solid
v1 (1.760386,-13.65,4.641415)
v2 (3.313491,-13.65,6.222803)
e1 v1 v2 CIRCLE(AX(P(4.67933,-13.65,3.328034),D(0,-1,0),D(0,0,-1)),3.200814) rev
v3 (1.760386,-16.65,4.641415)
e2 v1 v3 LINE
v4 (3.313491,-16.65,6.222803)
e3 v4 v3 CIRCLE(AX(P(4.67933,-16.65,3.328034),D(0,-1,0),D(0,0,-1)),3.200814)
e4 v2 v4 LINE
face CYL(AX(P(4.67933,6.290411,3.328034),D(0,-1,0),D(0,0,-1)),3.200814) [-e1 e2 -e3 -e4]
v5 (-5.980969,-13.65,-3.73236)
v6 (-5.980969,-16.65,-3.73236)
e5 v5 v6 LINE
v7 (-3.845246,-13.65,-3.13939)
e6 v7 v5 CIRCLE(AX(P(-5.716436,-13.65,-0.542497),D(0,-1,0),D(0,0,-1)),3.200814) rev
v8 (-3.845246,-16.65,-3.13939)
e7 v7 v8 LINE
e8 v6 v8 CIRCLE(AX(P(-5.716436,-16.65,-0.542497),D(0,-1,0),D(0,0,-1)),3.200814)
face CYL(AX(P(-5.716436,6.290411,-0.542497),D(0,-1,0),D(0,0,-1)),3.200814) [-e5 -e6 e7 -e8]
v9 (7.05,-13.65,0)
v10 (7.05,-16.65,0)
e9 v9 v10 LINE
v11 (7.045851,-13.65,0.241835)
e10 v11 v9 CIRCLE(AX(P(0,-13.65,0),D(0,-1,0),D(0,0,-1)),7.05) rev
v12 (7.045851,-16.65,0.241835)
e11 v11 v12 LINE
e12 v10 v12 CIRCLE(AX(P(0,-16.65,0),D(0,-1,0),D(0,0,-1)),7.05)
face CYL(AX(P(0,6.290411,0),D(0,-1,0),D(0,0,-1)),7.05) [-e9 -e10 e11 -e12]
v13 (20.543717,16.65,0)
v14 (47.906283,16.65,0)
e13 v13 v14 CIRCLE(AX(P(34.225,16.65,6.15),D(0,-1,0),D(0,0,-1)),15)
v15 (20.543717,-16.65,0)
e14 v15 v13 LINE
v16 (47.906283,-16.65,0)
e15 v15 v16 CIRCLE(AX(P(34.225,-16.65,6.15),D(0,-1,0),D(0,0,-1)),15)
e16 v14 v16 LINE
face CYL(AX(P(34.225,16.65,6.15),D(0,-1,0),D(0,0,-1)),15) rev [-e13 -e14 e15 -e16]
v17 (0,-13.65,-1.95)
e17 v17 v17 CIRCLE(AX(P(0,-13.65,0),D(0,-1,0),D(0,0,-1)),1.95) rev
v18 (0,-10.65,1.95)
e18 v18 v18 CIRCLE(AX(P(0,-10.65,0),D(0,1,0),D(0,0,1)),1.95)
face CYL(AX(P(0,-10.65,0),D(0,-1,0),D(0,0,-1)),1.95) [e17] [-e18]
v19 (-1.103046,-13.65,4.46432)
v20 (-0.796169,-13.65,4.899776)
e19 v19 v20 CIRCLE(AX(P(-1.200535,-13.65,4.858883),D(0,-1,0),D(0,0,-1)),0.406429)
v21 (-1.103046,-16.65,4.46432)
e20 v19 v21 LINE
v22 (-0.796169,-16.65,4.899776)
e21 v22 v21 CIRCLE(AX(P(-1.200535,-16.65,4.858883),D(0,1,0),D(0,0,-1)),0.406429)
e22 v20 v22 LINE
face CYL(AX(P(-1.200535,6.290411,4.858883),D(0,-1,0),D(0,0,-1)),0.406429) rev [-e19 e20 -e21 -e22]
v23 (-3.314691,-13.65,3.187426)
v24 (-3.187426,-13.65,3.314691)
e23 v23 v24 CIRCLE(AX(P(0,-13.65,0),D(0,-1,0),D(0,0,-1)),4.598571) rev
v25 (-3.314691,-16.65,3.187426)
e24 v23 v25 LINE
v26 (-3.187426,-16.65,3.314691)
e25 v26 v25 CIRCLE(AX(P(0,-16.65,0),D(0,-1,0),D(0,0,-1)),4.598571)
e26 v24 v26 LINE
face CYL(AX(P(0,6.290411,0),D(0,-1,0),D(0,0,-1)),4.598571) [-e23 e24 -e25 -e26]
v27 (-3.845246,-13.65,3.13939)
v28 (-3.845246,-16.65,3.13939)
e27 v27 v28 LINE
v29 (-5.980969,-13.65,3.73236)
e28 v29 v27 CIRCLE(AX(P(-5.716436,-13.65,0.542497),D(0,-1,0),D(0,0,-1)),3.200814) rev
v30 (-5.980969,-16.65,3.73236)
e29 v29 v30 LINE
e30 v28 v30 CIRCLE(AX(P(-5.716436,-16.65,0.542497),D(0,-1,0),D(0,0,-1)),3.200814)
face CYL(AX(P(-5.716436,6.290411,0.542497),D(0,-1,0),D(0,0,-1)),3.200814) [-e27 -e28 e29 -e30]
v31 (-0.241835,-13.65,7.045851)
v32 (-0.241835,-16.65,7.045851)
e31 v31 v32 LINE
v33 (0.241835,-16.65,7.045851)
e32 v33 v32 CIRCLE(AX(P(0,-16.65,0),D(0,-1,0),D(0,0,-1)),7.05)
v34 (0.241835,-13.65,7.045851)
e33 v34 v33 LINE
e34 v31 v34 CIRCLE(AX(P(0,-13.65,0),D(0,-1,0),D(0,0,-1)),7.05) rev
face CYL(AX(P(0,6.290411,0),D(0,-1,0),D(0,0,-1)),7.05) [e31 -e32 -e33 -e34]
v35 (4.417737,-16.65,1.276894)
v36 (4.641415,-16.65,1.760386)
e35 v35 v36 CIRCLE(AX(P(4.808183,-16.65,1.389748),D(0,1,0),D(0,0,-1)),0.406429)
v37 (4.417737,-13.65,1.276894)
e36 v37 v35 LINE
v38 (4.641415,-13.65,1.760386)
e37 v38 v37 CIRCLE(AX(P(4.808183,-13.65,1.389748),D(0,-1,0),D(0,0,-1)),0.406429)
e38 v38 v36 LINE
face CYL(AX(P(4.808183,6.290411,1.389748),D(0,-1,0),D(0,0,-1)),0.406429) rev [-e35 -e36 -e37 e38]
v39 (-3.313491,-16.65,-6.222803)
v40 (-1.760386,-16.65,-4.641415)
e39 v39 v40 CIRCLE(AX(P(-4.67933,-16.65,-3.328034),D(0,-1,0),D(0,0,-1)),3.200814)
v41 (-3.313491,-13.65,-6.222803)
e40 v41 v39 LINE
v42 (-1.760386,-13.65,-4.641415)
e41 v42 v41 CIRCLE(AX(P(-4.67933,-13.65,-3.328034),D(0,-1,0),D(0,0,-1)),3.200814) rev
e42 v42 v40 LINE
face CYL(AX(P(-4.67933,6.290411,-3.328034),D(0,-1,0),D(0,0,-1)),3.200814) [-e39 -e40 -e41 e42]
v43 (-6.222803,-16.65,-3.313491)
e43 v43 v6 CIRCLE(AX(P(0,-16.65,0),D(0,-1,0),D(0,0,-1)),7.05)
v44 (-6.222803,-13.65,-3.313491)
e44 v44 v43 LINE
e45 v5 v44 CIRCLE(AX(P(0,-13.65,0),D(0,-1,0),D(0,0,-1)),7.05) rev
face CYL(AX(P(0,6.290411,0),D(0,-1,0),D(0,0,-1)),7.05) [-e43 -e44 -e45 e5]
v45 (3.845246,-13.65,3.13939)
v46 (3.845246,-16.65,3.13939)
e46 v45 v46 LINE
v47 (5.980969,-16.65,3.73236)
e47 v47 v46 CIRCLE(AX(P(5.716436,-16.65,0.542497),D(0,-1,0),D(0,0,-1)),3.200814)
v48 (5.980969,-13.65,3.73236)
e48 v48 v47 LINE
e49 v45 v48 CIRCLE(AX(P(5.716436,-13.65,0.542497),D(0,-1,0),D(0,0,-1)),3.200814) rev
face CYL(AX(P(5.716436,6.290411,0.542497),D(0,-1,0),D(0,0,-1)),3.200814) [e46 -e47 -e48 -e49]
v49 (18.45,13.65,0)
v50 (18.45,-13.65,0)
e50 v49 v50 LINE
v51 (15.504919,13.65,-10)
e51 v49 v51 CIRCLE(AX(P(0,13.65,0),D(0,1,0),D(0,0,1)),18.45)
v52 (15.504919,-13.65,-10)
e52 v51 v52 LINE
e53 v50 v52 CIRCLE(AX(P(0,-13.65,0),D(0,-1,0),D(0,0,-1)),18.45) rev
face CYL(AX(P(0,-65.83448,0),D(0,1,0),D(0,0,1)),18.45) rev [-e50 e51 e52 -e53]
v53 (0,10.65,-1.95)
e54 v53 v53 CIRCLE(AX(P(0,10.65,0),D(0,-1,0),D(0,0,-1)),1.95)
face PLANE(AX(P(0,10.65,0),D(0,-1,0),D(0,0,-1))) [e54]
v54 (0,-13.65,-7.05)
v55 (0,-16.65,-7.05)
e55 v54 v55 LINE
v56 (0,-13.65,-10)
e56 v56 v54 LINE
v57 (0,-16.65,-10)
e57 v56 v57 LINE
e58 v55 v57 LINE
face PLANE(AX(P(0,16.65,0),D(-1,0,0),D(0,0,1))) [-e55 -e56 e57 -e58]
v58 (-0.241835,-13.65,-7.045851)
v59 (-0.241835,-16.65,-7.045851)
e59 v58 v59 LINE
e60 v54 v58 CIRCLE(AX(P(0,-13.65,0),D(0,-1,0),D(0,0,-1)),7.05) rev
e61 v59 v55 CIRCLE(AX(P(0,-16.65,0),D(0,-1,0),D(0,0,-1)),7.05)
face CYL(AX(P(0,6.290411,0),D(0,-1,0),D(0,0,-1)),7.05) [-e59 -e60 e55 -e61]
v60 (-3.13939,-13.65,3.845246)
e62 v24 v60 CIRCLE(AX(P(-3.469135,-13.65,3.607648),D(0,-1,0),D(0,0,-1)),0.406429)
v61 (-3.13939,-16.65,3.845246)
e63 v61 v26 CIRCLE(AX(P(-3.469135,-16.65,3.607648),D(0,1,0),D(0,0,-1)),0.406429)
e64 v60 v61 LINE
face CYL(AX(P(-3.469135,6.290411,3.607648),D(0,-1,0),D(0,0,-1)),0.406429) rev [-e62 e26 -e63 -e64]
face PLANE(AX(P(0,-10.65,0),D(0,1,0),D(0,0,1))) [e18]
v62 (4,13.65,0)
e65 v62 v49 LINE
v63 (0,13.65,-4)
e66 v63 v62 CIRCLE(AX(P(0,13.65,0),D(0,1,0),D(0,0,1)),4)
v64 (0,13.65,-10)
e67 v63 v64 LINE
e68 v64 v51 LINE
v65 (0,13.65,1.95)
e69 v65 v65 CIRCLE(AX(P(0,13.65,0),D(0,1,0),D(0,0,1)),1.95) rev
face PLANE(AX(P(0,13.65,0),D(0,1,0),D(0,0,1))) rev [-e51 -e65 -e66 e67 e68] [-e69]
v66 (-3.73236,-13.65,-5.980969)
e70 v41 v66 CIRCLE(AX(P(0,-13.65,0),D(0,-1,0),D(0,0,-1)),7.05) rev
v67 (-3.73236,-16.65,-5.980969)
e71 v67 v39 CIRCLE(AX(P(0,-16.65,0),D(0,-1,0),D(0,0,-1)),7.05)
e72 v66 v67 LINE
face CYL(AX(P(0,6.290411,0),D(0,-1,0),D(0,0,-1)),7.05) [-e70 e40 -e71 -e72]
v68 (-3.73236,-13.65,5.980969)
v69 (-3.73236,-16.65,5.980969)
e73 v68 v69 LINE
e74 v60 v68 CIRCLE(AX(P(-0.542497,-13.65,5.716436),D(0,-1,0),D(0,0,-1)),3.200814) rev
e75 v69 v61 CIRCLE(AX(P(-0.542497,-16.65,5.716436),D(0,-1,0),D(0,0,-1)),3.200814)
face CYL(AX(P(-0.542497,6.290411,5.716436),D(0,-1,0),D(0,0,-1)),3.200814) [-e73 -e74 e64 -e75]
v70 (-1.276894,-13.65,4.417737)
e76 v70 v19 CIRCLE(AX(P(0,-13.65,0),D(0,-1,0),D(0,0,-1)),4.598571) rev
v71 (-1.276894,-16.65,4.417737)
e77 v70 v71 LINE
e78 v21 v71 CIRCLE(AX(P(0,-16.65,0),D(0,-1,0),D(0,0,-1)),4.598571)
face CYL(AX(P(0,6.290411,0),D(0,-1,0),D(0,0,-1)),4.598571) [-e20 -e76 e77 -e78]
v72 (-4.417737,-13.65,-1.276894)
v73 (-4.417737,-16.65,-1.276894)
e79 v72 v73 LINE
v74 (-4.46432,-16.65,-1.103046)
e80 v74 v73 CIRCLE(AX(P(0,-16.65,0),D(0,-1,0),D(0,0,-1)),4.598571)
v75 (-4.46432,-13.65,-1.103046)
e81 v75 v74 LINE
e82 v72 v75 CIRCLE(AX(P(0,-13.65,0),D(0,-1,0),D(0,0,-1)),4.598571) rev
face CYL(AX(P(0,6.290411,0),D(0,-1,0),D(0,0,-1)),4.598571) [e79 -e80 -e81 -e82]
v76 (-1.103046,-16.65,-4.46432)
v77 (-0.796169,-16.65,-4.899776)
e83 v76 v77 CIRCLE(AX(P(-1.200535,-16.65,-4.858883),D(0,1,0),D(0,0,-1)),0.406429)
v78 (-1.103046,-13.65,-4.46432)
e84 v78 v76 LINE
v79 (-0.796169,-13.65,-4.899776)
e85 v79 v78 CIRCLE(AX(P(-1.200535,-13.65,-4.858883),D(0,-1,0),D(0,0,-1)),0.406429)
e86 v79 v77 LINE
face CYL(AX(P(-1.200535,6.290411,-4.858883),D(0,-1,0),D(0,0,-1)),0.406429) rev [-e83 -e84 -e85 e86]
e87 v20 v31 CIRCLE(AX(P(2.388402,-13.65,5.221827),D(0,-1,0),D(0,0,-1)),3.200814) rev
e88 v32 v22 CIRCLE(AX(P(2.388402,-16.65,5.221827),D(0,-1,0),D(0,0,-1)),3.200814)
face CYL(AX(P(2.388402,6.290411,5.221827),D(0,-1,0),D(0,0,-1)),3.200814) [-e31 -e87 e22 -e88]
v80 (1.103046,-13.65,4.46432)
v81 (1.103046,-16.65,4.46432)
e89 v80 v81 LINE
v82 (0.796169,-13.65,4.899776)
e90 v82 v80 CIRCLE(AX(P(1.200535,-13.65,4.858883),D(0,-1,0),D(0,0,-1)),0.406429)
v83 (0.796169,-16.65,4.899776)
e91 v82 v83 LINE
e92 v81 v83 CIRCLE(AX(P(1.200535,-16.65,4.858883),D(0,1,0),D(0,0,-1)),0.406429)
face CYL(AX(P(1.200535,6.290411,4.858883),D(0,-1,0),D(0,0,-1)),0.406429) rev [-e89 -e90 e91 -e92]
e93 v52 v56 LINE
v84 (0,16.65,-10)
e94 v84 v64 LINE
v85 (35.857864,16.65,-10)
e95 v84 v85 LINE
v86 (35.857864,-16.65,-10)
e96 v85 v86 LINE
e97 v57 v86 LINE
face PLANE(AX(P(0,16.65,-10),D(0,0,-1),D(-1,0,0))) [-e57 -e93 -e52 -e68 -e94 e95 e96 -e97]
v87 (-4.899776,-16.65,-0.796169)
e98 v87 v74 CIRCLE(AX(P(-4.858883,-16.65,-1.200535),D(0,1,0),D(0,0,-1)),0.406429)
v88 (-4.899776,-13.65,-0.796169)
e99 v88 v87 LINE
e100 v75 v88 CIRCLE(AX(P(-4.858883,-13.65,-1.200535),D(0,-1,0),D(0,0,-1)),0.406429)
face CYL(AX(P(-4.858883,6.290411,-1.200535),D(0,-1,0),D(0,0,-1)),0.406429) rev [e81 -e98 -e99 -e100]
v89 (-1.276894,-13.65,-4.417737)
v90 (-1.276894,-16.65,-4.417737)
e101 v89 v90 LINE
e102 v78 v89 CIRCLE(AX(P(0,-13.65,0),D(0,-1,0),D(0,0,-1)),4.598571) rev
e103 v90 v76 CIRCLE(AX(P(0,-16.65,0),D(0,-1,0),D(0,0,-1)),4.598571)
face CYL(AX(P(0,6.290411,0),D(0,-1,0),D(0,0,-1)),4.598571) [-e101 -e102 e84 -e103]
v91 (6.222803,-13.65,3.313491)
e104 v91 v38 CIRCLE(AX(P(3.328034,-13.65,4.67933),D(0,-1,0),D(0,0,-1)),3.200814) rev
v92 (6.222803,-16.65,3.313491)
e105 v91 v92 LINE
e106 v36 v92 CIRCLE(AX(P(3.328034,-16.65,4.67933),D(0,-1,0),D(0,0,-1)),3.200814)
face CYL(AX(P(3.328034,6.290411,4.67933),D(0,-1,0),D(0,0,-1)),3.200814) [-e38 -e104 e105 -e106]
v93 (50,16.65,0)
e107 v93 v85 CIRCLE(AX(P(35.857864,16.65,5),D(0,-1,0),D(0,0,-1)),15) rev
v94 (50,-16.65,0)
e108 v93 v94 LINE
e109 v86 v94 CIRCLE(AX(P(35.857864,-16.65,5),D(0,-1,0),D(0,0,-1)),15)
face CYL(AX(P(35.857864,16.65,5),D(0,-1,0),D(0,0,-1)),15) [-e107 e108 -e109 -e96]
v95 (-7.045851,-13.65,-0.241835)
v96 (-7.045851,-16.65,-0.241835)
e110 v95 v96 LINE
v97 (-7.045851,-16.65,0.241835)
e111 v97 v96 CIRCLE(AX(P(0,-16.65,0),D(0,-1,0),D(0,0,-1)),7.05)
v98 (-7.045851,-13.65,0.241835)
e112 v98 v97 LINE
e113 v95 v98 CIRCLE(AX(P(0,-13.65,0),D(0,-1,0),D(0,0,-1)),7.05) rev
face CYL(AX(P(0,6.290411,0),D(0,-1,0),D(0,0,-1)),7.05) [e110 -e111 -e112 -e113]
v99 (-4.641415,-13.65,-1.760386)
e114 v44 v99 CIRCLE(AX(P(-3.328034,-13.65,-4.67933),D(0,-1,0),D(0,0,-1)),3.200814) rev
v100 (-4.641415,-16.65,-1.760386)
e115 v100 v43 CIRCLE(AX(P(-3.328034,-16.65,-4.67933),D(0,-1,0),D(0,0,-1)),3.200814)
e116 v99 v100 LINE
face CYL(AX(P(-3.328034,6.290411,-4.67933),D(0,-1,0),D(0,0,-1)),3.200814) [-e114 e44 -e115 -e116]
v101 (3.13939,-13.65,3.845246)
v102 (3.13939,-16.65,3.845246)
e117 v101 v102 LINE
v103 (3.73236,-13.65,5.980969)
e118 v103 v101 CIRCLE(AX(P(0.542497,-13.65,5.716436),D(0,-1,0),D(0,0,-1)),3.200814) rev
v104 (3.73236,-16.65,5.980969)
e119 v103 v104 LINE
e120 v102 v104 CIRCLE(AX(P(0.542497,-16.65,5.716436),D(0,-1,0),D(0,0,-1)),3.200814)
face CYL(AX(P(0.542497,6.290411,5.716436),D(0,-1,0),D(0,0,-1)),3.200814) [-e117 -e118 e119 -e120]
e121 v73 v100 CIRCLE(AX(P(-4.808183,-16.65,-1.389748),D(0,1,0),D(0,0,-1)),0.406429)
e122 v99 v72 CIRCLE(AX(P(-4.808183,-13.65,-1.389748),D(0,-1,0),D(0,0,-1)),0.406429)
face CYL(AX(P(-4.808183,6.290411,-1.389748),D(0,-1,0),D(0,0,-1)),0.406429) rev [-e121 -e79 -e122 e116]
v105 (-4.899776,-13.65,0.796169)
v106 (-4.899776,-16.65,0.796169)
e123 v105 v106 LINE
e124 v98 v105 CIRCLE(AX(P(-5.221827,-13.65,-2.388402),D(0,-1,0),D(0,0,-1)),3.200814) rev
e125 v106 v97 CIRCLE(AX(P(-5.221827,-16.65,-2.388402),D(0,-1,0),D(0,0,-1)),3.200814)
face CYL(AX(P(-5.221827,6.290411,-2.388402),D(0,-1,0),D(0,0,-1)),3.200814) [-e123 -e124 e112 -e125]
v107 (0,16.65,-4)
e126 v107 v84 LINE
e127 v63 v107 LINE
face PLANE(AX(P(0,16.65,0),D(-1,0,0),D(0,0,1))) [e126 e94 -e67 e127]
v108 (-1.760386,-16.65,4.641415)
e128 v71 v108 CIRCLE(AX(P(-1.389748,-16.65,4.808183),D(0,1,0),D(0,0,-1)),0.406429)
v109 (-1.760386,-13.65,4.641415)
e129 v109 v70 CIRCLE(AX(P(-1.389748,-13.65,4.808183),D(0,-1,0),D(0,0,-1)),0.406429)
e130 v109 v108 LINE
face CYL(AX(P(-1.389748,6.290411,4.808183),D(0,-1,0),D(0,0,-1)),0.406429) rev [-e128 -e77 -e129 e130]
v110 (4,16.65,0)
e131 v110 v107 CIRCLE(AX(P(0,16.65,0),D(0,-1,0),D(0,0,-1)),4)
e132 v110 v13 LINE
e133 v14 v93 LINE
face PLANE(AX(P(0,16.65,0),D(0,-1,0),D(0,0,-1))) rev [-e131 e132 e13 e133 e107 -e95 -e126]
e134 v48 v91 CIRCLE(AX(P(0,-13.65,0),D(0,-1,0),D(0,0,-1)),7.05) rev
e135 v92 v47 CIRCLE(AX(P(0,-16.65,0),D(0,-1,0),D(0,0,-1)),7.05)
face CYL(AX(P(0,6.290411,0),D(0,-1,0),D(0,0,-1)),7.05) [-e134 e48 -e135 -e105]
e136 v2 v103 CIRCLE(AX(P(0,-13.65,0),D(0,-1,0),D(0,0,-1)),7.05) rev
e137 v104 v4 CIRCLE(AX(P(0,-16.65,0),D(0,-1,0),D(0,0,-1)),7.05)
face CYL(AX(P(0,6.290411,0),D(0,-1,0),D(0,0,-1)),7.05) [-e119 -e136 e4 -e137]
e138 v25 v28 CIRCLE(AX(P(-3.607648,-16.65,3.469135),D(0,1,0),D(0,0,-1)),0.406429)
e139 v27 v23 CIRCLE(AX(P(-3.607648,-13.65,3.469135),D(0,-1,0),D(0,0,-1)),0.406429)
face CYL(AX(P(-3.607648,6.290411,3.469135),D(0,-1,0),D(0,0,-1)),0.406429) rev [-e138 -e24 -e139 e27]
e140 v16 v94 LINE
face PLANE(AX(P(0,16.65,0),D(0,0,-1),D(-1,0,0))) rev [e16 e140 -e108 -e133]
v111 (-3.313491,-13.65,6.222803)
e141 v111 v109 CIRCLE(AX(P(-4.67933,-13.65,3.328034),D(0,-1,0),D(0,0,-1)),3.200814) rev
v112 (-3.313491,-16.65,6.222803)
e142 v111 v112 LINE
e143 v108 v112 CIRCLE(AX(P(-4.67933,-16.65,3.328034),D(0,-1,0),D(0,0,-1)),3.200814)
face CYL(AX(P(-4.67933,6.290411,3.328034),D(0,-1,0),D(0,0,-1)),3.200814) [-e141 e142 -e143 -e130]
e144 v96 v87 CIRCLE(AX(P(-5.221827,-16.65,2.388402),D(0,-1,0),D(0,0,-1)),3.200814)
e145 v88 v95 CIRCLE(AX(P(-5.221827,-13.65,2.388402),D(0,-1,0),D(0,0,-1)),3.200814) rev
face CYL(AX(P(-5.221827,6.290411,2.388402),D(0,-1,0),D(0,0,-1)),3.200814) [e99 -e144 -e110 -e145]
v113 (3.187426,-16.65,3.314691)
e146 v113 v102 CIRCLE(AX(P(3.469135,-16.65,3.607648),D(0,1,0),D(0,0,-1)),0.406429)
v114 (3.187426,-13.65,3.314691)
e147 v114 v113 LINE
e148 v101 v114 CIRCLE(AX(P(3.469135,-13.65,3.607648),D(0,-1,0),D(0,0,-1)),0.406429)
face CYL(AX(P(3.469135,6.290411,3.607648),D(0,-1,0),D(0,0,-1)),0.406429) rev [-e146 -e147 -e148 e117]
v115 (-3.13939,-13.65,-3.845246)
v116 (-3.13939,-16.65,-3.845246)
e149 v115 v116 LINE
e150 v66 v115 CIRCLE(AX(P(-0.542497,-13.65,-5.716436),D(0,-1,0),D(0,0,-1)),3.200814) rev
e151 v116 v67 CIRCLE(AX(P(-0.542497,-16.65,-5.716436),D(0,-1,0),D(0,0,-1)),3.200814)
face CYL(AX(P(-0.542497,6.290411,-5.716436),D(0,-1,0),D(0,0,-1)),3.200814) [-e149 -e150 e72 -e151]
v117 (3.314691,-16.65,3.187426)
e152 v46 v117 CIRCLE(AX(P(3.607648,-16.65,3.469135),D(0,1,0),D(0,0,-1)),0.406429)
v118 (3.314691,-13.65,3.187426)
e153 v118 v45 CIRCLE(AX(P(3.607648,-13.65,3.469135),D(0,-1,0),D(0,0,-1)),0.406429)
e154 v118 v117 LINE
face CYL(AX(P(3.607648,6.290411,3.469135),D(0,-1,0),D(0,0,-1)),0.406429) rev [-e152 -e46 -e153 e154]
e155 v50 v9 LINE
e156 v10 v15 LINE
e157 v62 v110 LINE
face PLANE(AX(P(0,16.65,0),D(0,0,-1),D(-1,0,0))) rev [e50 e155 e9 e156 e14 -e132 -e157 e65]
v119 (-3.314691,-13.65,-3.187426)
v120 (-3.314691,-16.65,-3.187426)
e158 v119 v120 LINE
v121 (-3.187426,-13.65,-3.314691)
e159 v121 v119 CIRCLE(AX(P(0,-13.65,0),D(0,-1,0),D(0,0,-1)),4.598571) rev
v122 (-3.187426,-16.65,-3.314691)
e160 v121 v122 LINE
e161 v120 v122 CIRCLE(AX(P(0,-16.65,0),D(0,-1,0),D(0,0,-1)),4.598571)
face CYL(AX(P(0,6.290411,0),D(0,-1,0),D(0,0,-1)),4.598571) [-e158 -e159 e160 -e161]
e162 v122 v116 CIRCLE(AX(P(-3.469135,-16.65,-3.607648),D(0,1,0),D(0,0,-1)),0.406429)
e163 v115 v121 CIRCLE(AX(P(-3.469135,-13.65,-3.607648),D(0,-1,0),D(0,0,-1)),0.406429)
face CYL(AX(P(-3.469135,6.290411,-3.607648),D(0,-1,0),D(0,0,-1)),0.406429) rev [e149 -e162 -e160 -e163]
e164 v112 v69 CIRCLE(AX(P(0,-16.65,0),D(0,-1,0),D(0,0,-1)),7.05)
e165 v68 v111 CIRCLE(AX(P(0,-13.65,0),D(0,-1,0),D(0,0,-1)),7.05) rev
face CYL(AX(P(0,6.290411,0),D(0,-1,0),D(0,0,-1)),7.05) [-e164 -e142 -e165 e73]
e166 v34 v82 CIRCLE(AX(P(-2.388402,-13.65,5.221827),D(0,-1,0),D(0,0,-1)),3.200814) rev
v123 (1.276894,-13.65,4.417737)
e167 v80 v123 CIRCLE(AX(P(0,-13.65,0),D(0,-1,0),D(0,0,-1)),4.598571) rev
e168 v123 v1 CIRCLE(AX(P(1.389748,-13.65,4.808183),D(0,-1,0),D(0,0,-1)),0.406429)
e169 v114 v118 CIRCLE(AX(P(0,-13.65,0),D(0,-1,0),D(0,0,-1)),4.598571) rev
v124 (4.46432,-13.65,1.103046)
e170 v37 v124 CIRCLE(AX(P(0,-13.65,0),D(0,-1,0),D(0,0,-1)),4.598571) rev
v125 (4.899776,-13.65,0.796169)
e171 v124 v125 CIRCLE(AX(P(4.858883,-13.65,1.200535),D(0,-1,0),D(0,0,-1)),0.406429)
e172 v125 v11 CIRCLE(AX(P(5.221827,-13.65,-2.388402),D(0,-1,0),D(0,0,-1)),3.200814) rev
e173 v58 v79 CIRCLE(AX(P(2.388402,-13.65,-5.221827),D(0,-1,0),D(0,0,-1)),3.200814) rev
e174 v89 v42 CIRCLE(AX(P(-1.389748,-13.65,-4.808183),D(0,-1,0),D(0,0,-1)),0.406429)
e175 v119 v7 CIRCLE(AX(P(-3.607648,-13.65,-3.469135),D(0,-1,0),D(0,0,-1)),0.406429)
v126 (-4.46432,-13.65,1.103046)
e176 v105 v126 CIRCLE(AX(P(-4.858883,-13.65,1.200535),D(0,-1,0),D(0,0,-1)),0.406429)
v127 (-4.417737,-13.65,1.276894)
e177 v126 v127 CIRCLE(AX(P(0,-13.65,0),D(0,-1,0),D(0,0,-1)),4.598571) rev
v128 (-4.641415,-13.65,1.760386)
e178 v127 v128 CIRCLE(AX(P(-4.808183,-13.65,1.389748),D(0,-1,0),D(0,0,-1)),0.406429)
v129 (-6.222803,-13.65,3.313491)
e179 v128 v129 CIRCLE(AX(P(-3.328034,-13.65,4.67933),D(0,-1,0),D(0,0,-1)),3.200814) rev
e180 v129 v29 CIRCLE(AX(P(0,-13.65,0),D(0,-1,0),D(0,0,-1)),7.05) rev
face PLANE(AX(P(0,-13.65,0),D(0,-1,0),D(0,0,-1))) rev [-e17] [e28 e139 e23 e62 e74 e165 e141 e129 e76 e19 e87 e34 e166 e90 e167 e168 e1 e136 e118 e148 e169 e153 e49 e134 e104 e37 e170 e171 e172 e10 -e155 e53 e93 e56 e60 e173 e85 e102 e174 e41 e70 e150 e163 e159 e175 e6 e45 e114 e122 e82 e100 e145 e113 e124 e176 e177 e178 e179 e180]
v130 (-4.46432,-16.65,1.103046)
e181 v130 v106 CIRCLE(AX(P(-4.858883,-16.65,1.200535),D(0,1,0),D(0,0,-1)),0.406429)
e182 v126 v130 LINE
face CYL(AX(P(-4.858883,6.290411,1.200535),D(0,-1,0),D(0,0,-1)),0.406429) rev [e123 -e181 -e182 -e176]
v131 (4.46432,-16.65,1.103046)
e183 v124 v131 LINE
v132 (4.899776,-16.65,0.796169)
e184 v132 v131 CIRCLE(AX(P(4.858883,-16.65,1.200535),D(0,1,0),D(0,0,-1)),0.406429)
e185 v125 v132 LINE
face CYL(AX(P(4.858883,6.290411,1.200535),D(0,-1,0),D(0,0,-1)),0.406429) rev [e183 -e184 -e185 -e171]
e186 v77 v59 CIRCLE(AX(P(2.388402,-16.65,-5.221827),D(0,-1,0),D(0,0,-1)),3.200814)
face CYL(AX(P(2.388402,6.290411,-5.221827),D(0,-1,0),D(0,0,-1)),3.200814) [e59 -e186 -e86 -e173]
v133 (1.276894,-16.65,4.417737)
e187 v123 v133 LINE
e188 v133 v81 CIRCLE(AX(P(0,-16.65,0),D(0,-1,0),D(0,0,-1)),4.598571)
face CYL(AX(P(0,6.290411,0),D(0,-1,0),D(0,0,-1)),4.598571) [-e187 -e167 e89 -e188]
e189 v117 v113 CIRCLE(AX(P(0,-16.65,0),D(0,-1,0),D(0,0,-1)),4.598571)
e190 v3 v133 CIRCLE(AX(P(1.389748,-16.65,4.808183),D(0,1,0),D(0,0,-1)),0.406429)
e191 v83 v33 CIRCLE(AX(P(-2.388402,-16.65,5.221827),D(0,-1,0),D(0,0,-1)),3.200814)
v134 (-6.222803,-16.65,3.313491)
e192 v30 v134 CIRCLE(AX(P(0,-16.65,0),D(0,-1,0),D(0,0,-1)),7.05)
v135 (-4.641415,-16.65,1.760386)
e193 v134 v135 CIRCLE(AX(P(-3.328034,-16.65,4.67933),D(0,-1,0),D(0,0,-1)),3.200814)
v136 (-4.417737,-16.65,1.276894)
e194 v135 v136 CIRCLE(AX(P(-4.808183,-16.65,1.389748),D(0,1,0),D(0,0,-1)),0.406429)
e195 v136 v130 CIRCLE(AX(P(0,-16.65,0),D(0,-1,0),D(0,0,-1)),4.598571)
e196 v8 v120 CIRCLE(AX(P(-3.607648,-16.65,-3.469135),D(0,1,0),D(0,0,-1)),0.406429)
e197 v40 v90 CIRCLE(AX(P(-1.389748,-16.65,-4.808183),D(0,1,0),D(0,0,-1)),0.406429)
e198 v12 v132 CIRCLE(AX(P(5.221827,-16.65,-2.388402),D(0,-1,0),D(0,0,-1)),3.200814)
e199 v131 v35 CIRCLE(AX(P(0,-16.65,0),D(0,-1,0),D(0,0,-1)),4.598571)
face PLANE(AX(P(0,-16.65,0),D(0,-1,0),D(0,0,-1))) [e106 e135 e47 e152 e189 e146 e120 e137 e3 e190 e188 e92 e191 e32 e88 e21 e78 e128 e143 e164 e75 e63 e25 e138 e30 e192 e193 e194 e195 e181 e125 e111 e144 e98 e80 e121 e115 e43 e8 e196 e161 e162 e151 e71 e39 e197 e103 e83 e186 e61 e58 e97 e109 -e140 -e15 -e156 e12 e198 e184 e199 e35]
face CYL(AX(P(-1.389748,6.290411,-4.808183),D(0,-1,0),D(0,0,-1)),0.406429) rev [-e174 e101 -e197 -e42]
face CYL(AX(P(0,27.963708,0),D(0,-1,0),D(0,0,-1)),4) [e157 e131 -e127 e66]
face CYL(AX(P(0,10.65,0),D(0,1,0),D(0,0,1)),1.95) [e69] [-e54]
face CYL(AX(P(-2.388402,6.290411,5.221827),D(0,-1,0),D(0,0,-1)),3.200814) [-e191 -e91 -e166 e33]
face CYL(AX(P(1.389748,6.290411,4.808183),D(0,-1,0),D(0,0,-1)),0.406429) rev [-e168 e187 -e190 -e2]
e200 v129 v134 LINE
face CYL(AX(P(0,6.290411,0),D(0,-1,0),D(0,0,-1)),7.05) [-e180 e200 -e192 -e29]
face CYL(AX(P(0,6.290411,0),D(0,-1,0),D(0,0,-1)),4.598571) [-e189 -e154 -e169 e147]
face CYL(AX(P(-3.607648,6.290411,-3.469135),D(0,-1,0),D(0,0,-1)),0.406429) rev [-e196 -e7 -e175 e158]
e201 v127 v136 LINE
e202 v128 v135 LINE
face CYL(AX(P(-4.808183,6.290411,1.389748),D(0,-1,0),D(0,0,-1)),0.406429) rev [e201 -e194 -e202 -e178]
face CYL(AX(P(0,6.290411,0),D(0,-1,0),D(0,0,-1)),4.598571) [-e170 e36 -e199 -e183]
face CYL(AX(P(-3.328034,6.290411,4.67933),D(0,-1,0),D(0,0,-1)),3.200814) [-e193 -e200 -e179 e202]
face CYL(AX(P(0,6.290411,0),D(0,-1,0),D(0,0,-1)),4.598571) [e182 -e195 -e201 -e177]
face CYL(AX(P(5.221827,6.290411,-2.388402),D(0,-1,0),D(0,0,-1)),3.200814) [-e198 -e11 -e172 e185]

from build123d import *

# Parameters (mm, degrees)
SKETCH1_W           = 50
SKETCH1_H           = 10
BOSS_EXTRUDE2_DEPTH = 16.65
CUT_EXTRUDE1_START  = -27.3
SKETCH2_R           = 18.45
CUT_EXTRUDE1_DEPTH  = 27.3
SKETCH3_R           = 4
BOSS_EXTRUDE3_DEPTH = 3
BOSS_EXTRUDE4_START = 3
SKETCH5_R           = 4
BOSS_EXTRUDE4_DEPTH = 3
SKETCH4_R           = 1.95
BOSS_EXTRUDE6_DEPTH = 3
BOSS_EXTRUDE5_START = 3
SKETCH6_R           = 1.95
BOSS_EXTRUDE5_DEPTH = 3
BOSS_EXTRUDE7_DEPTH = 3
SKETCH8_R           = 15
CUT_EXTRUDE2_DEPTH  = 61.900656811
FILLET1_R           = 15


with BuildPart() as part:
    # Sketch1 → Boss-Extrude2 (new, symmetric)
    with BuildSketch(Plane(origin=(0, 0, 0), x_dir=(1, 0, 0), z_dir=(0, 1, 0))):
        with Locations((25, 5)):
            Rectangle(SKETCH1_W, SKETCH1_H)
    extrude(amount=BOSS_EXTRUDE2_DEPTH, both=True)

    # Sketch2 → Cut-Extrude1 (cut)
    with BuildSketch(Plane(origin=(0, 13.65, 0), x_dir=(1, 0, 0), z_dir=(0, 1, 0)).offset(CUT_EXTRUDE1_START)):
        Circle(SKETCH2_R)
    extrude(amount=CUT_EXTRUDE1_DEPTH, mode=Mode.SUBTRACT)

    # Sketch3 → Boss-Extrude3 (add)
    with BuildSketch(Plane(origin=(0, 13.65, 0), x_dir=(1, 0, 0), z_dir=(0, 1, 0))):
        Circle(SKETCH3_R)
    extrude(amount=BOSS_EXTRUDE3_DEPTH)

    # Sketch5 → Boss-Extrude4 (add)
    with BuildSketch(Plane(origin=(0, -13.65, 0), x_dir=(-1, 0, 0), z_dir=(0, -1, 0)).offset(BOSS_EXTRUDE4_START)):
        Circle(SKETCH5_R)
    extrude(amount=-BOSS_EXTRUDE4_DEPTH)

    # Sketch4 → Boss-Extrude6 (add)
    with BuildSketch(Plane.XZ.offset(-13.65)):
        with Locations(Location((0, 0, 0), (0, 0, 90))):
            Circle(SKETCH4_R)
    extrude(amount=BOSS_EXTRUDE6_DEPTH)

    # Sketch6 → Boss-Extrude5 (add)
    with BuildSketch(Plane(origin=(0, -13.65, 0), x_dir=(1, 0, 0), z_dir=(0, 1, 0)).offset(BOSS_EXTRUDE5_START)):
        with Locations(Location((0, 0, 0), (0, 0, 270))):
            Circle(SKETCH6_R)
    extrude(amount=-BOSS_EXTRUDE5_DEPTH)

    # Sketch7 → Boss-Extrude7 (add)
    with BuildSketch(Plane.XZ.offset(16.65)):
        with BuildLine():
            ThreePointArc((1.103045949, -4.464319525), (1.190197866, -4.441878907), (1.276893949, -4.417737093))
            ThreePointArc((1.276893949, -4.417737093), (1.56039667, -4.439315905), (1.760385559, -4.6414146))
            ThreePointArc((1.760385559, -4.6414146), (2.395683629, -5.570836958), (3.313490513, -6.222803277))
            ThreePointArc((3.313490513, -6.222803277), (3.525, -6.105479097), (3.732360464, -5.980968598))
            ThreePointArc((3.732360464, -5.980968598), (3.626644512, -4.860141361), (3.139390174, -3.845245915))
            ThreePointArc((3.139390174, -3.845245915), (3.064362014, -3.571001109), (3.187425576, -3.314691145))
            ThreePointArc((3.187425576, -3.314691145), (3.251681041, -3.251681041), (3.314691145, -3.187425576))
            ThreePointArc((3.314691145, -3.187425576), (3.571001109, -3.064362014), (3.845245915, -3.139390174))
            ThreePointArc((3.845245915, -3.139390174), (4.860141361, -3.626644512), (5.980968598, -3.732360464))
            ThreePointArc((5.980968598, -3.732360464), (6.105479097, -3.525), (6.222803277, -3.313490513))
            ThreePointArc((6.222803277, -3.313490513), (5.570836958, -2.395683629), (4.6414146, -1.760385559))
            ThreePointArc((4.6414146, -1.760385559), (4.439315905, -1.56039667), (4.417737093, -1.276893949))
            ThreePointArc((4.417737093, -1.276893949), (4.441878907, -1.190197866), (4.464319525, -1.103045949))
            ThreePointArc((4.464319525, -1.103045949), (4.624758685, -0.868314796), (4.899775733, -0.796168685))
            ThreePointArc((4.899775733, -0.796168685), (6.022328141, -0.710695597), (7.045850977, -0.241834679))
            ThreePointArc((7.045850977, -0.241834679), (7.05, 0), (7.045850977, 0.241834679))
            ThreePointArc((7.045850977, 0.241834679), (6.022328141, 0.710695597), (4.899775733, 0.796168685))
            ThreePointArc((4.899775733, 0.796168685), (4.624758685, 0.868314796), (4.464319525, 1.103045949))
            ThreePointArc((4.464319525, 1.103045949), (4.441878907, 1.190197866), (4.417737093, 1.276893949))
            ThreePointArc((4.417737093, 1.276893949), (4.439315905, 1.56039667), (4.6414146, 1.760385559))
            ThreePointArc((4.6414146, 1.760385559), (5.570836958, 2.395683629), (6.222803277, 3.313490513))
            ThreePointArc((6.222803277, 3.313490513), (6.105479097, 3.525), (5.980968598, 3.732360464))
            ThreePointArc((5.980968598, 3.732360464), (4.860141361, 3.626644512), (3.845245915, 3.139390174))
            ThreePointArc((3.845245915, 3.139390174), (3.571001109, 3.064362014), (3.314691145, 3.187425576))
            ThreePointArc((3.314691145, 3.187425576), (3.251681041, 3.251681041), (3.187425576, 3.314691145))
            ThreePointArc((3.187425576, 3.314691145), (3.064362014, 3.571001109), (3.139390174, 3.845245915))
            ThreePointArc((3.139390174, 3.845245915), (3.626644512, 4.860141361), (3.732360464, 5.980968598))
            ThreePointArc((3.732360464, 5.980968598), (3.525, 6.105479097), (3.313490513, 6.222803277))
            ThreePointArc((3.313490513, 6.222803277), (2.395683629, 5.570836958), (1.760385559, 4.6414146))
            ThreePointArc((1.760385559, 4.6414146), (1.56039667, 4.439315905), (1.276893949, 4.417737093))
            ThreePointArc((1.276893949, 4.417737093), (1.190197866, 4.441878907), (1.103045949, 4.464319525))
            ThreePointArc((1.103045949, 4.464319525), (0.868314796, 4.624758685), (0.796168685, 4.899775733))
            ThreePointArc((0.796168685, 4.899775733), (0.710695597, 6.022328141), (0.241834679, 7.045850977))
            ThreePointArc((0.241834679, 7.045850977), (0, 7.05), (-0.241834679, 7.045850977))
            ThreePointArc((-0.241834679, 7.045850977), (-0.710695597, 6.022328141), (-0.796168685, 4.899775733))
            ThreePointArc((-0.796168685, 4.899775733), (-0.868314796, 4.624758685), (-1.103045949, 4.464319525))
            ThreePointArc((-1.103045949, 4.464319525), (-1.190197866, 4.441878907), (-1.276893949, 4.417737093))
            ThreePointArc((-1.276893949, 4.417737093), (-1.56039667, 4.439315905), (-1.760385559, 4.6414146))
            ThreePointArc((-1.760385559, 4.6414146), (-2.395683629, 5.570836958), (-3.313490513, 6.222803277))
            ThreePointArc((-3.313490513, 6.222803277), (-3.525, 6.105479097), (-3.732360464, 5.980968598))
            ThreePointArc((-3.732360464, 5.980968598), (-3.626644512, 4.860141361), (-3.139390174, 3.845245915))
            ThreePointArc((-3.139390174, 3.845245915), (-3.064362014, 3.571001109), (-3.187425576, 3.314691145))
            ThreePointArc((-3.187425576, 3.314691145), (-3.251681041, 3.251681041), (-3.314691145, 3.187425576))
            ThreePointArc((-3.314691145, 3.187425576), (-3.571001109, 3.064362014), (-3.845245915, 3.139390174))
            ThreePointArc((-3.845245915, 3.139390174), (-4.860141361, 3.626644512), (-5.980968598, 3.732360464))
            ThreePointArc((-5.980968598, 3.732360464), (-6.105479097, 3.525), (-6.222803277, 3.313490513))
            ThreePointArc((-6.222803277, 3.313490513), (-5.570836958, 2.395683629), (-4.6414146, 1.760385559))
            ThreePointArc((-4.6414146, 1.760385559), (-4.439315905, 1.56039667), (-4.417737093, 1.276893949))
            ThreePointArc((-4.417737093, 1.276893949), (-4.441878907, 1.190197866), (-4.464319525, 1.103045949))
            ThreePointArc((-4.464319525, 1.103045949), (-4.624758685, 0.868314796), (-4.899775733, 0.796168685))
            ThreePointArc((-4.899775733, 0.796168685), (-6.022328141, 0.710695597), (-7.045850977, 0.241834679))
            ThreePointArc((-7.045850977, 0.241834679), (-7.05, 0), (-7.045850977, -0.241834679))
            ThreePointArc((-7.045850977, -0.241834679), (-6.022328141, -0.710695597), (-4.899775733, -0.796168685))
            ThreePointArc((-4.899775733, -0.796168685), (-4.624758685, -0.868314796), (-4.464319525, -1.103045949))
            ThreePointArc((-4.464319525, -1.103045949), (-4.441878907, -1.190197866), (-4.417737093, -1.276893949))
            ThreePointArc((-4.417737093, -1.276893949), (-4.439315905, -1.56039667), (-4.6414146, -1.760385559))
            ThreePointArc((-4.6414146, -1.760385559), (-5.570836958, -2.395683629), (-6.222803277, -3.313490513))
            ThreePointArc((-6.222803277, -3.313490513), (-6.105479097, -3.525), (-5.980968598, -3.732360464))
            ThreePointArc((-5.980968598, -3.732360464), (-4.860141361, -3.626644512), (-3.845245915, -3.139390174))
            ThreePointArc((-3.845245915, -3.139390174), (-3.571001109, -3.064362014), (-3.314691145, -3.187425576))
            ThreePointArc((-3.314691145, -3.187425576), (-3.251681041, -3.251681041), (-3.187425576, -3.314691145))
            ThreePointArc((-3.187425576, -3.314691145), (-3.064362014, -3.571001109), (-3.139390174, -3.845245915))
            ThreePointArc((-3.139390174, -3.845245915), (-3.626644512, -4.860141361), (-3.732360464, -5.980968598))
            ThreePointArc((-3.732360464, -5.980968598), (-3.525, -6.105479097), (-3.313490513, -6.222803277))
            ThreePointArc((-3.313490513, -6.222803277), (-2.395683629, -5.570836958), (-1.760385559, -4.6414146))
            ThreePointArc((-1.760385559, -4.6414146), (-1.56039667, -4.439315905), (-1.276893949, -4.417737093))
            ThreePointArc((-1.276893949, -4.417737093), (-1.190197866, -4.441878907), (-1.103045949, -4.464319525))
            ThreePointArc((-1.103045949, -4.464319525), (-0.868314796, -4.624758685), (-0.796168685, -4.899775733))
            ThreePointArc((-0.796168685, -4.899775733), (-0.710695597, -6.022328141), (-0.241834679, -7.045850977))
            ThreePointArc((-0.241834679, -7.045850977), (0, -7.05), (0.241834679, -7.045850977))
            ThreePointArc((0.241834679, -7.045850977), (0.710695597, -6.022328141), (0.796168685, -4.899775733))
            ThreePointArc((0.796168685, -4.899775733), (0.868314796, -4.624758685), (1.103045949, -4.464319525))
        make_face()
    extrude(amount=-BOSS_EXTRUDE7_DEPTH)

    # Sketch8 → Cut-Extrude2 (cut, through all)
    with BuildSketch(Plane.XZ.offset(16.65)):
        with Locations((34.225, 6.15)):
            Circle(SKETCH8_R)
    extrude(amount=-CUT_EXTRUDE2_DEPTH, mode=Mode.SUBTRACT)

    # Fillet1
    # the kernel refuses this fillet: 15 mm, written as the material it takes off along each edge
    with BuildSketch(Plane(origin=(50, -52.005339059, -10), x_dir=(-1, 0, 0), z_dir=(0, 1, 0))) as fillet1_piece_1:
        with BuildLine():
            CenterArc((14.142135624, 15), FILLET1_R, 199.471220634, 70.528779366)
            Line((0, 10), (-0.282842712, 9.9))
            ThreePointArc((-0.282842712, 9.9), (-0.3, 5), (-0.3, 0))
            Line((-0.3, 0), (0, -0.3))
            Line((0, -0.3), (14.142135624, -0.3))
            Line((14.142135624, -0.3), (14.142135624, 0))
        make_face()
    extrude(amount=104.010678119, mode=Mode.SUBTRACT)


solid = part.part
